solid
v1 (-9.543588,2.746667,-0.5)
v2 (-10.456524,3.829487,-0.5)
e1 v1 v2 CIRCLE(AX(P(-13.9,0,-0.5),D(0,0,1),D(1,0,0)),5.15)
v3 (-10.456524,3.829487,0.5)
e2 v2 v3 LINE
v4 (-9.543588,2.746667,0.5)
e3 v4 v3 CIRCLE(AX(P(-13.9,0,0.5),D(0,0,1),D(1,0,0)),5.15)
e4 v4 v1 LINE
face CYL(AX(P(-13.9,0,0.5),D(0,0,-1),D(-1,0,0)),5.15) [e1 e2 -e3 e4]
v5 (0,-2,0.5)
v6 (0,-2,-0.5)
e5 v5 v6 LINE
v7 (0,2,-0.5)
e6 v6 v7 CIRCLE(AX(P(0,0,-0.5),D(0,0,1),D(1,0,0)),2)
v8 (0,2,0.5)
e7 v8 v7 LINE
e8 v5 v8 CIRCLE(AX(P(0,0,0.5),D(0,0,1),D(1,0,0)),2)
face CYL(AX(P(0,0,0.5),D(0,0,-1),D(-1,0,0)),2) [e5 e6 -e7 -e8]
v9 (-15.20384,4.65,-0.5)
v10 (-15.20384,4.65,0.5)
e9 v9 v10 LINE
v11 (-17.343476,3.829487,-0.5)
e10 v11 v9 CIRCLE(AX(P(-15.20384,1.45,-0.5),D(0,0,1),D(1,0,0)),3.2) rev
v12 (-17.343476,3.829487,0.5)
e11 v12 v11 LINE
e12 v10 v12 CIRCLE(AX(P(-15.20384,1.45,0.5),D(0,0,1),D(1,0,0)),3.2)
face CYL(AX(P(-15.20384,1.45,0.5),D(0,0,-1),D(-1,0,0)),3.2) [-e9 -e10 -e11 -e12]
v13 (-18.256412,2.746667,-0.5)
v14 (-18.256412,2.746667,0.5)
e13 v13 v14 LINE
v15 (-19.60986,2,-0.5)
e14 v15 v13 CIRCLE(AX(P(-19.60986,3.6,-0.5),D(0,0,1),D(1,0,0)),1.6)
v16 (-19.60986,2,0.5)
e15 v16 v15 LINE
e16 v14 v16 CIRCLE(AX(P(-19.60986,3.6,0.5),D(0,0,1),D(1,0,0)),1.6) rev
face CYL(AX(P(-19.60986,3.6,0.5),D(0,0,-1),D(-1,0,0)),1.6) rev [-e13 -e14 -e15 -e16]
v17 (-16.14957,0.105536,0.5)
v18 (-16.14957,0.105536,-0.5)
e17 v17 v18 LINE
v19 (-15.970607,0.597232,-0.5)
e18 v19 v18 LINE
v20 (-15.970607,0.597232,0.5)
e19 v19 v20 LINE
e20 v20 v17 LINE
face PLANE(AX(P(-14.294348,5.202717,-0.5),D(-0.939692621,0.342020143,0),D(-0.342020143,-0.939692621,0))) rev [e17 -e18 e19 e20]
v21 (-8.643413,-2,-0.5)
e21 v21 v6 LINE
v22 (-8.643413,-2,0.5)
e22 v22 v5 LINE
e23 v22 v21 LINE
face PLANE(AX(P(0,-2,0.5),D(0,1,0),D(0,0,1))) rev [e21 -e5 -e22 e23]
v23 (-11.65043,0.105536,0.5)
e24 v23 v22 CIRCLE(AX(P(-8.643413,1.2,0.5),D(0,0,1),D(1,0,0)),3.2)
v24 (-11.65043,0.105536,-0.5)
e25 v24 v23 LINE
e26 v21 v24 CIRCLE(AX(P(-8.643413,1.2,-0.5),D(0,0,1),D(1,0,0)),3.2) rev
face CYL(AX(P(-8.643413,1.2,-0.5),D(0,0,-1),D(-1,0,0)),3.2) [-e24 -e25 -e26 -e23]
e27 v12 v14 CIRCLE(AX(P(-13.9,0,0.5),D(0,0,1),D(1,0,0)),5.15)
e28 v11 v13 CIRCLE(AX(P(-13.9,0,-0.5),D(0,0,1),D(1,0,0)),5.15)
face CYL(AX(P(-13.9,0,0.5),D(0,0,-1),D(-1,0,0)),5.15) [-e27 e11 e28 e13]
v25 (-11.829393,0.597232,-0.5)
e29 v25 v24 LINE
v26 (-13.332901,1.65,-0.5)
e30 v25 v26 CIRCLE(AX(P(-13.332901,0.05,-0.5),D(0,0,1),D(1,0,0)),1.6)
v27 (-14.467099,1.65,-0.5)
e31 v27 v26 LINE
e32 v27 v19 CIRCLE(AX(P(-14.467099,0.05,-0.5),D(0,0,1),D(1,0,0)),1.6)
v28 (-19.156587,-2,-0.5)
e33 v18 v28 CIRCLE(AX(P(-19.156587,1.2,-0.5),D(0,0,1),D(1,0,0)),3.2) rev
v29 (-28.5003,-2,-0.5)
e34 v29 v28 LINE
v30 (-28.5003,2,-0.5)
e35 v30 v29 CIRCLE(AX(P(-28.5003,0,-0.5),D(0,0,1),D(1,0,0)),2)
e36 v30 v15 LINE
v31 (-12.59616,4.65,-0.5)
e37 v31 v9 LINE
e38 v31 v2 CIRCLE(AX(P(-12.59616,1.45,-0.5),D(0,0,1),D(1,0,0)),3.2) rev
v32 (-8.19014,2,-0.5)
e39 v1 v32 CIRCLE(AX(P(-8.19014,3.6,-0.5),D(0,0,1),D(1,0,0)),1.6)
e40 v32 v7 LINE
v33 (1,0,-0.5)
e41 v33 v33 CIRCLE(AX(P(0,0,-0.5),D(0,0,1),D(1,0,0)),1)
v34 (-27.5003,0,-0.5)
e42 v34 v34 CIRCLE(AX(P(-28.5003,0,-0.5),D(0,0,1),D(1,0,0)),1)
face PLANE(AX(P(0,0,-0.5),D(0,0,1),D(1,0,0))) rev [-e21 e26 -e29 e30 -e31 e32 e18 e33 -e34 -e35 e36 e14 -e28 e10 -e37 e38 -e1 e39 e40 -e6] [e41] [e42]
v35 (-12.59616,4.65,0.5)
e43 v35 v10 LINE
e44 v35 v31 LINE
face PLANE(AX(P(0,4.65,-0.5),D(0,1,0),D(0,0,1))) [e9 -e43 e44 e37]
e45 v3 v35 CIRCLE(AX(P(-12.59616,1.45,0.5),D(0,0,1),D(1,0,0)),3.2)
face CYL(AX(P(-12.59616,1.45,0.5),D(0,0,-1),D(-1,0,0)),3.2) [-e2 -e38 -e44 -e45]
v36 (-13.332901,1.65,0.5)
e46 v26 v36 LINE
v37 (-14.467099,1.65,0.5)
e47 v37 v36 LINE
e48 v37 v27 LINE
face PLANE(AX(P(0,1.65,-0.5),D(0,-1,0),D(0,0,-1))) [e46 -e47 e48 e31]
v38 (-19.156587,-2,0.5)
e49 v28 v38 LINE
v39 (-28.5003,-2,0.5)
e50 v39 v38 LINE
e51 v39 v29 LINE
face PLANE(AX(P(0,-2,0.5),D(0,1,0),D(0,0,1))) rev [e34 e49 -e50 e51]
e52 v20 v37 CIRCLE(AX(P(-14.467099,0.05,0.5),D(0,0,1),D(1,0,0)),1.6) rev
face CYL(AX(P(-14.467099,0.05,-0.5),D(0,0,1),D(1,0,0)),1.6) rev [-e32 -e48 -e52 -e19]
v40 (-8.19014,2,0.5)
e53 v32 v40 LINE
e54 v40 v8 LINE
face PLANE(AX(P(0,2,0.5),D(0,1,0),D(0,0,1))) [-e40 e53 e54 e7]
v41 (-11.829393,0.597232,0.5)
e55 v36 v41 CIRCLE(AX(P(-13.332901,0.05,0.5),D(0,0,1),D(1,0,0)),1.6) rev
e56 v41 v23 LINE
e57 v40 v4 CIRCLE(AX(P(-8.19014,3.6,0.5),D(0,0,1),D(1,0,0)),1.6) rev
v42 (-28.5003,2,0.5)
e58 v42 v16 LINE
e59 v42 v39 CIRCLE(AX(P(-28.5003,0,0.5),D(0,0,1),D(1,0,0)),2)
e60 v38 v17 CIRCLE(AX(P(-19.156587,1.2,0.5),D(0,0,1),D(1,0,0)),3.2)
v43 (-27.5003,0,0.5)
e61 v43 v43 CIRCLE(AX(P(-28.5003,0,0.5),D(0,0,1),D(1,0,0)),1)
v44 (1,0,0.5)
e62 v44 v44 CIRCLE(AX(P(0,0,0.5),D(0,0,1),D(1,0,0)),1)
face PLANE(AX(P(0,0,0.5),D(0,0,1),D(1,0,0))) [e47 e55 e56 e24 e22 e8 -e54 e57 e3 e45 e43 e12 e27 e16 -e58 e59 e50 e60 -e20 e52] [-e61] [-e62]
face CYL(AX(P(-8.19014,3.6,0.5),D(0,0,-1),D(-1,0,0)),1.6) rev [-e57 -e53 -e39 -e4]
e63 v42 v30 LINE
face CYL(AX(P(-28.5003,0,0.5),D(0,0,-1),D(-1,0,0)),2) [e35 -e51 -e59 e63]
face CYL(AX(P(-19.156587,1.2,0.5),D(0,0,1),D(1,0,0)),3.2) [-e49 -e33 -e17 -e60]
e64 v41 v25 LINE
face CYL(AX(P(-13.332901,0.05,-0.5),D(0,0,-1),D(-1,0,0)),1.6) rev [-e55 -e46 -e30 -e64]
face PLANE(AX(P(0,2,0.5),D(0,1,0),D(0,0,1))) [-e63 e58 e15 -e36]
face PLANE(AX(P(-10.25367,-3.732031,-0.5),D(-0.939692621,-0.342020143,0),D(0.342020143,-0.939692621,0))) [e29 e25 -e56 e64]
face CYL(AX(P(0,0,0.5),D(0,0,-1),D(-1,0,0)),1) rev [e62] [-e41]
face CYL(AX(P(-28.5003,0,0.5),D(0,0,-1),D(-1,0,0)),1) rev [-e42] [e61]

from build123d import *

# Parameters (mm, degrees)
SKETCH_1_R      = 1
EXTRUDE_1_DEPTH = 0.5
EXTRUDE1_START  = -0.5
EXTRUDE1_DEPTH  = 1
EXTRUDE2_DEPTH  = 0.5
FILLET1_R       = 1.6
FILLET2_R       = 3.2


# Read off the part's stored shape, not the designer's step: Extrude1
with BuildPart() as part:
    # Эскиз1 → Бобышка-Вытянуть1 (new, symmetric)
    with BuildSketch(Plane.XY):
        with BuildLine():
            Line((0, 2), (-28.5003, 2))
            ThreePointArc((-28.5003, 2), (-30.5003, 0), (-28.5003, -2))
            Line((-28.5003, -2), (0, -2))
            ThreePointArc((0, -2), (2, 0), (0, 2))
        make_face()
        with Locations((-28.5003, 0)):
            Circle(SKETCH_1_R, mode=Mode.SUBTRACT)
        Circle(SKETCH_1_R, mode=Mode.SUBTRACT)
    extrude(amount=EXTRUDE_1_DEPTH, both=True)

    # Extrude1 outline → Extrude1 (add)
    with BuildSketch(Plane.XY.offset(EXTRUDE1_START)):
        with BuildLine():
            ThreePointArc((-9.154212394, 2), (-13.9, 5.15), (-18.645787606, 2))
            Line((-18.645787606, 2), (-9.154212394, 2))
        make_face()
    extrude(amount=EXTRUDE1_DEPTH)

    # Sketch → Extrude2 (cut, symmetric)
    with BuildSketch(Plane.XY):
        with BuildLine():
            ThreePointArc((-11.879660865, 0.735343308), (-12.140166364, 1.235105491), (-12.521595125, 1.65))
            Line((-12.521595125, 1.65), (-15.278404875, 1.65))
            ThreePointArc((-15.278404875, 1.65), (-15.659833636, 1.235105491), (-15.920339135, 0.735343308))
            Line((-15.920339135, 0.735343308), (-16.915922679, -2))
            Line((-16.915922679, -2), (-10.884077321, -2))
            Line((-10.884077321, -2), (-11.879660865, 0.735343308))
        make_face()
        with BuildLine():
            ThreePointArc((-11.686405638, 4.65), (-13.9, 5.15), (-16.113594362, 4.65))
            Line((-16.113594362, 4.65), (-11.686405638, 4.65))
        make_face()
    extrude(amount=EXTRUDE2_DEPTH, both=True, mode=Mode.SUBTRACT)

    # Fillet1
    fillet1_edges = [part.edges().sort_by_distance(p)[0] for p in [
        (-18.645787606, 2, 0),
        (-9.154212394, 2, 0),
        (-15.278404875, 1.65, 0),
        (-12.521595125, 1.65, 0),
    ]]
    fillet(fillet1_edges, radius=FILLET1_R)

    # Fillet2
    fillet2_edges = [part.edges().sort_by_distance(p)[0] for p in [
        (-10.884077321, -2, 0),
        (-16.915922679, -2, 0),
        (-11.686405638, 4.65, 0),
        (-16.113594362, 4.65, 0),
    ]]
    fillet(fillet2_edges, radius=FILLET2_R)


solid = part.part
